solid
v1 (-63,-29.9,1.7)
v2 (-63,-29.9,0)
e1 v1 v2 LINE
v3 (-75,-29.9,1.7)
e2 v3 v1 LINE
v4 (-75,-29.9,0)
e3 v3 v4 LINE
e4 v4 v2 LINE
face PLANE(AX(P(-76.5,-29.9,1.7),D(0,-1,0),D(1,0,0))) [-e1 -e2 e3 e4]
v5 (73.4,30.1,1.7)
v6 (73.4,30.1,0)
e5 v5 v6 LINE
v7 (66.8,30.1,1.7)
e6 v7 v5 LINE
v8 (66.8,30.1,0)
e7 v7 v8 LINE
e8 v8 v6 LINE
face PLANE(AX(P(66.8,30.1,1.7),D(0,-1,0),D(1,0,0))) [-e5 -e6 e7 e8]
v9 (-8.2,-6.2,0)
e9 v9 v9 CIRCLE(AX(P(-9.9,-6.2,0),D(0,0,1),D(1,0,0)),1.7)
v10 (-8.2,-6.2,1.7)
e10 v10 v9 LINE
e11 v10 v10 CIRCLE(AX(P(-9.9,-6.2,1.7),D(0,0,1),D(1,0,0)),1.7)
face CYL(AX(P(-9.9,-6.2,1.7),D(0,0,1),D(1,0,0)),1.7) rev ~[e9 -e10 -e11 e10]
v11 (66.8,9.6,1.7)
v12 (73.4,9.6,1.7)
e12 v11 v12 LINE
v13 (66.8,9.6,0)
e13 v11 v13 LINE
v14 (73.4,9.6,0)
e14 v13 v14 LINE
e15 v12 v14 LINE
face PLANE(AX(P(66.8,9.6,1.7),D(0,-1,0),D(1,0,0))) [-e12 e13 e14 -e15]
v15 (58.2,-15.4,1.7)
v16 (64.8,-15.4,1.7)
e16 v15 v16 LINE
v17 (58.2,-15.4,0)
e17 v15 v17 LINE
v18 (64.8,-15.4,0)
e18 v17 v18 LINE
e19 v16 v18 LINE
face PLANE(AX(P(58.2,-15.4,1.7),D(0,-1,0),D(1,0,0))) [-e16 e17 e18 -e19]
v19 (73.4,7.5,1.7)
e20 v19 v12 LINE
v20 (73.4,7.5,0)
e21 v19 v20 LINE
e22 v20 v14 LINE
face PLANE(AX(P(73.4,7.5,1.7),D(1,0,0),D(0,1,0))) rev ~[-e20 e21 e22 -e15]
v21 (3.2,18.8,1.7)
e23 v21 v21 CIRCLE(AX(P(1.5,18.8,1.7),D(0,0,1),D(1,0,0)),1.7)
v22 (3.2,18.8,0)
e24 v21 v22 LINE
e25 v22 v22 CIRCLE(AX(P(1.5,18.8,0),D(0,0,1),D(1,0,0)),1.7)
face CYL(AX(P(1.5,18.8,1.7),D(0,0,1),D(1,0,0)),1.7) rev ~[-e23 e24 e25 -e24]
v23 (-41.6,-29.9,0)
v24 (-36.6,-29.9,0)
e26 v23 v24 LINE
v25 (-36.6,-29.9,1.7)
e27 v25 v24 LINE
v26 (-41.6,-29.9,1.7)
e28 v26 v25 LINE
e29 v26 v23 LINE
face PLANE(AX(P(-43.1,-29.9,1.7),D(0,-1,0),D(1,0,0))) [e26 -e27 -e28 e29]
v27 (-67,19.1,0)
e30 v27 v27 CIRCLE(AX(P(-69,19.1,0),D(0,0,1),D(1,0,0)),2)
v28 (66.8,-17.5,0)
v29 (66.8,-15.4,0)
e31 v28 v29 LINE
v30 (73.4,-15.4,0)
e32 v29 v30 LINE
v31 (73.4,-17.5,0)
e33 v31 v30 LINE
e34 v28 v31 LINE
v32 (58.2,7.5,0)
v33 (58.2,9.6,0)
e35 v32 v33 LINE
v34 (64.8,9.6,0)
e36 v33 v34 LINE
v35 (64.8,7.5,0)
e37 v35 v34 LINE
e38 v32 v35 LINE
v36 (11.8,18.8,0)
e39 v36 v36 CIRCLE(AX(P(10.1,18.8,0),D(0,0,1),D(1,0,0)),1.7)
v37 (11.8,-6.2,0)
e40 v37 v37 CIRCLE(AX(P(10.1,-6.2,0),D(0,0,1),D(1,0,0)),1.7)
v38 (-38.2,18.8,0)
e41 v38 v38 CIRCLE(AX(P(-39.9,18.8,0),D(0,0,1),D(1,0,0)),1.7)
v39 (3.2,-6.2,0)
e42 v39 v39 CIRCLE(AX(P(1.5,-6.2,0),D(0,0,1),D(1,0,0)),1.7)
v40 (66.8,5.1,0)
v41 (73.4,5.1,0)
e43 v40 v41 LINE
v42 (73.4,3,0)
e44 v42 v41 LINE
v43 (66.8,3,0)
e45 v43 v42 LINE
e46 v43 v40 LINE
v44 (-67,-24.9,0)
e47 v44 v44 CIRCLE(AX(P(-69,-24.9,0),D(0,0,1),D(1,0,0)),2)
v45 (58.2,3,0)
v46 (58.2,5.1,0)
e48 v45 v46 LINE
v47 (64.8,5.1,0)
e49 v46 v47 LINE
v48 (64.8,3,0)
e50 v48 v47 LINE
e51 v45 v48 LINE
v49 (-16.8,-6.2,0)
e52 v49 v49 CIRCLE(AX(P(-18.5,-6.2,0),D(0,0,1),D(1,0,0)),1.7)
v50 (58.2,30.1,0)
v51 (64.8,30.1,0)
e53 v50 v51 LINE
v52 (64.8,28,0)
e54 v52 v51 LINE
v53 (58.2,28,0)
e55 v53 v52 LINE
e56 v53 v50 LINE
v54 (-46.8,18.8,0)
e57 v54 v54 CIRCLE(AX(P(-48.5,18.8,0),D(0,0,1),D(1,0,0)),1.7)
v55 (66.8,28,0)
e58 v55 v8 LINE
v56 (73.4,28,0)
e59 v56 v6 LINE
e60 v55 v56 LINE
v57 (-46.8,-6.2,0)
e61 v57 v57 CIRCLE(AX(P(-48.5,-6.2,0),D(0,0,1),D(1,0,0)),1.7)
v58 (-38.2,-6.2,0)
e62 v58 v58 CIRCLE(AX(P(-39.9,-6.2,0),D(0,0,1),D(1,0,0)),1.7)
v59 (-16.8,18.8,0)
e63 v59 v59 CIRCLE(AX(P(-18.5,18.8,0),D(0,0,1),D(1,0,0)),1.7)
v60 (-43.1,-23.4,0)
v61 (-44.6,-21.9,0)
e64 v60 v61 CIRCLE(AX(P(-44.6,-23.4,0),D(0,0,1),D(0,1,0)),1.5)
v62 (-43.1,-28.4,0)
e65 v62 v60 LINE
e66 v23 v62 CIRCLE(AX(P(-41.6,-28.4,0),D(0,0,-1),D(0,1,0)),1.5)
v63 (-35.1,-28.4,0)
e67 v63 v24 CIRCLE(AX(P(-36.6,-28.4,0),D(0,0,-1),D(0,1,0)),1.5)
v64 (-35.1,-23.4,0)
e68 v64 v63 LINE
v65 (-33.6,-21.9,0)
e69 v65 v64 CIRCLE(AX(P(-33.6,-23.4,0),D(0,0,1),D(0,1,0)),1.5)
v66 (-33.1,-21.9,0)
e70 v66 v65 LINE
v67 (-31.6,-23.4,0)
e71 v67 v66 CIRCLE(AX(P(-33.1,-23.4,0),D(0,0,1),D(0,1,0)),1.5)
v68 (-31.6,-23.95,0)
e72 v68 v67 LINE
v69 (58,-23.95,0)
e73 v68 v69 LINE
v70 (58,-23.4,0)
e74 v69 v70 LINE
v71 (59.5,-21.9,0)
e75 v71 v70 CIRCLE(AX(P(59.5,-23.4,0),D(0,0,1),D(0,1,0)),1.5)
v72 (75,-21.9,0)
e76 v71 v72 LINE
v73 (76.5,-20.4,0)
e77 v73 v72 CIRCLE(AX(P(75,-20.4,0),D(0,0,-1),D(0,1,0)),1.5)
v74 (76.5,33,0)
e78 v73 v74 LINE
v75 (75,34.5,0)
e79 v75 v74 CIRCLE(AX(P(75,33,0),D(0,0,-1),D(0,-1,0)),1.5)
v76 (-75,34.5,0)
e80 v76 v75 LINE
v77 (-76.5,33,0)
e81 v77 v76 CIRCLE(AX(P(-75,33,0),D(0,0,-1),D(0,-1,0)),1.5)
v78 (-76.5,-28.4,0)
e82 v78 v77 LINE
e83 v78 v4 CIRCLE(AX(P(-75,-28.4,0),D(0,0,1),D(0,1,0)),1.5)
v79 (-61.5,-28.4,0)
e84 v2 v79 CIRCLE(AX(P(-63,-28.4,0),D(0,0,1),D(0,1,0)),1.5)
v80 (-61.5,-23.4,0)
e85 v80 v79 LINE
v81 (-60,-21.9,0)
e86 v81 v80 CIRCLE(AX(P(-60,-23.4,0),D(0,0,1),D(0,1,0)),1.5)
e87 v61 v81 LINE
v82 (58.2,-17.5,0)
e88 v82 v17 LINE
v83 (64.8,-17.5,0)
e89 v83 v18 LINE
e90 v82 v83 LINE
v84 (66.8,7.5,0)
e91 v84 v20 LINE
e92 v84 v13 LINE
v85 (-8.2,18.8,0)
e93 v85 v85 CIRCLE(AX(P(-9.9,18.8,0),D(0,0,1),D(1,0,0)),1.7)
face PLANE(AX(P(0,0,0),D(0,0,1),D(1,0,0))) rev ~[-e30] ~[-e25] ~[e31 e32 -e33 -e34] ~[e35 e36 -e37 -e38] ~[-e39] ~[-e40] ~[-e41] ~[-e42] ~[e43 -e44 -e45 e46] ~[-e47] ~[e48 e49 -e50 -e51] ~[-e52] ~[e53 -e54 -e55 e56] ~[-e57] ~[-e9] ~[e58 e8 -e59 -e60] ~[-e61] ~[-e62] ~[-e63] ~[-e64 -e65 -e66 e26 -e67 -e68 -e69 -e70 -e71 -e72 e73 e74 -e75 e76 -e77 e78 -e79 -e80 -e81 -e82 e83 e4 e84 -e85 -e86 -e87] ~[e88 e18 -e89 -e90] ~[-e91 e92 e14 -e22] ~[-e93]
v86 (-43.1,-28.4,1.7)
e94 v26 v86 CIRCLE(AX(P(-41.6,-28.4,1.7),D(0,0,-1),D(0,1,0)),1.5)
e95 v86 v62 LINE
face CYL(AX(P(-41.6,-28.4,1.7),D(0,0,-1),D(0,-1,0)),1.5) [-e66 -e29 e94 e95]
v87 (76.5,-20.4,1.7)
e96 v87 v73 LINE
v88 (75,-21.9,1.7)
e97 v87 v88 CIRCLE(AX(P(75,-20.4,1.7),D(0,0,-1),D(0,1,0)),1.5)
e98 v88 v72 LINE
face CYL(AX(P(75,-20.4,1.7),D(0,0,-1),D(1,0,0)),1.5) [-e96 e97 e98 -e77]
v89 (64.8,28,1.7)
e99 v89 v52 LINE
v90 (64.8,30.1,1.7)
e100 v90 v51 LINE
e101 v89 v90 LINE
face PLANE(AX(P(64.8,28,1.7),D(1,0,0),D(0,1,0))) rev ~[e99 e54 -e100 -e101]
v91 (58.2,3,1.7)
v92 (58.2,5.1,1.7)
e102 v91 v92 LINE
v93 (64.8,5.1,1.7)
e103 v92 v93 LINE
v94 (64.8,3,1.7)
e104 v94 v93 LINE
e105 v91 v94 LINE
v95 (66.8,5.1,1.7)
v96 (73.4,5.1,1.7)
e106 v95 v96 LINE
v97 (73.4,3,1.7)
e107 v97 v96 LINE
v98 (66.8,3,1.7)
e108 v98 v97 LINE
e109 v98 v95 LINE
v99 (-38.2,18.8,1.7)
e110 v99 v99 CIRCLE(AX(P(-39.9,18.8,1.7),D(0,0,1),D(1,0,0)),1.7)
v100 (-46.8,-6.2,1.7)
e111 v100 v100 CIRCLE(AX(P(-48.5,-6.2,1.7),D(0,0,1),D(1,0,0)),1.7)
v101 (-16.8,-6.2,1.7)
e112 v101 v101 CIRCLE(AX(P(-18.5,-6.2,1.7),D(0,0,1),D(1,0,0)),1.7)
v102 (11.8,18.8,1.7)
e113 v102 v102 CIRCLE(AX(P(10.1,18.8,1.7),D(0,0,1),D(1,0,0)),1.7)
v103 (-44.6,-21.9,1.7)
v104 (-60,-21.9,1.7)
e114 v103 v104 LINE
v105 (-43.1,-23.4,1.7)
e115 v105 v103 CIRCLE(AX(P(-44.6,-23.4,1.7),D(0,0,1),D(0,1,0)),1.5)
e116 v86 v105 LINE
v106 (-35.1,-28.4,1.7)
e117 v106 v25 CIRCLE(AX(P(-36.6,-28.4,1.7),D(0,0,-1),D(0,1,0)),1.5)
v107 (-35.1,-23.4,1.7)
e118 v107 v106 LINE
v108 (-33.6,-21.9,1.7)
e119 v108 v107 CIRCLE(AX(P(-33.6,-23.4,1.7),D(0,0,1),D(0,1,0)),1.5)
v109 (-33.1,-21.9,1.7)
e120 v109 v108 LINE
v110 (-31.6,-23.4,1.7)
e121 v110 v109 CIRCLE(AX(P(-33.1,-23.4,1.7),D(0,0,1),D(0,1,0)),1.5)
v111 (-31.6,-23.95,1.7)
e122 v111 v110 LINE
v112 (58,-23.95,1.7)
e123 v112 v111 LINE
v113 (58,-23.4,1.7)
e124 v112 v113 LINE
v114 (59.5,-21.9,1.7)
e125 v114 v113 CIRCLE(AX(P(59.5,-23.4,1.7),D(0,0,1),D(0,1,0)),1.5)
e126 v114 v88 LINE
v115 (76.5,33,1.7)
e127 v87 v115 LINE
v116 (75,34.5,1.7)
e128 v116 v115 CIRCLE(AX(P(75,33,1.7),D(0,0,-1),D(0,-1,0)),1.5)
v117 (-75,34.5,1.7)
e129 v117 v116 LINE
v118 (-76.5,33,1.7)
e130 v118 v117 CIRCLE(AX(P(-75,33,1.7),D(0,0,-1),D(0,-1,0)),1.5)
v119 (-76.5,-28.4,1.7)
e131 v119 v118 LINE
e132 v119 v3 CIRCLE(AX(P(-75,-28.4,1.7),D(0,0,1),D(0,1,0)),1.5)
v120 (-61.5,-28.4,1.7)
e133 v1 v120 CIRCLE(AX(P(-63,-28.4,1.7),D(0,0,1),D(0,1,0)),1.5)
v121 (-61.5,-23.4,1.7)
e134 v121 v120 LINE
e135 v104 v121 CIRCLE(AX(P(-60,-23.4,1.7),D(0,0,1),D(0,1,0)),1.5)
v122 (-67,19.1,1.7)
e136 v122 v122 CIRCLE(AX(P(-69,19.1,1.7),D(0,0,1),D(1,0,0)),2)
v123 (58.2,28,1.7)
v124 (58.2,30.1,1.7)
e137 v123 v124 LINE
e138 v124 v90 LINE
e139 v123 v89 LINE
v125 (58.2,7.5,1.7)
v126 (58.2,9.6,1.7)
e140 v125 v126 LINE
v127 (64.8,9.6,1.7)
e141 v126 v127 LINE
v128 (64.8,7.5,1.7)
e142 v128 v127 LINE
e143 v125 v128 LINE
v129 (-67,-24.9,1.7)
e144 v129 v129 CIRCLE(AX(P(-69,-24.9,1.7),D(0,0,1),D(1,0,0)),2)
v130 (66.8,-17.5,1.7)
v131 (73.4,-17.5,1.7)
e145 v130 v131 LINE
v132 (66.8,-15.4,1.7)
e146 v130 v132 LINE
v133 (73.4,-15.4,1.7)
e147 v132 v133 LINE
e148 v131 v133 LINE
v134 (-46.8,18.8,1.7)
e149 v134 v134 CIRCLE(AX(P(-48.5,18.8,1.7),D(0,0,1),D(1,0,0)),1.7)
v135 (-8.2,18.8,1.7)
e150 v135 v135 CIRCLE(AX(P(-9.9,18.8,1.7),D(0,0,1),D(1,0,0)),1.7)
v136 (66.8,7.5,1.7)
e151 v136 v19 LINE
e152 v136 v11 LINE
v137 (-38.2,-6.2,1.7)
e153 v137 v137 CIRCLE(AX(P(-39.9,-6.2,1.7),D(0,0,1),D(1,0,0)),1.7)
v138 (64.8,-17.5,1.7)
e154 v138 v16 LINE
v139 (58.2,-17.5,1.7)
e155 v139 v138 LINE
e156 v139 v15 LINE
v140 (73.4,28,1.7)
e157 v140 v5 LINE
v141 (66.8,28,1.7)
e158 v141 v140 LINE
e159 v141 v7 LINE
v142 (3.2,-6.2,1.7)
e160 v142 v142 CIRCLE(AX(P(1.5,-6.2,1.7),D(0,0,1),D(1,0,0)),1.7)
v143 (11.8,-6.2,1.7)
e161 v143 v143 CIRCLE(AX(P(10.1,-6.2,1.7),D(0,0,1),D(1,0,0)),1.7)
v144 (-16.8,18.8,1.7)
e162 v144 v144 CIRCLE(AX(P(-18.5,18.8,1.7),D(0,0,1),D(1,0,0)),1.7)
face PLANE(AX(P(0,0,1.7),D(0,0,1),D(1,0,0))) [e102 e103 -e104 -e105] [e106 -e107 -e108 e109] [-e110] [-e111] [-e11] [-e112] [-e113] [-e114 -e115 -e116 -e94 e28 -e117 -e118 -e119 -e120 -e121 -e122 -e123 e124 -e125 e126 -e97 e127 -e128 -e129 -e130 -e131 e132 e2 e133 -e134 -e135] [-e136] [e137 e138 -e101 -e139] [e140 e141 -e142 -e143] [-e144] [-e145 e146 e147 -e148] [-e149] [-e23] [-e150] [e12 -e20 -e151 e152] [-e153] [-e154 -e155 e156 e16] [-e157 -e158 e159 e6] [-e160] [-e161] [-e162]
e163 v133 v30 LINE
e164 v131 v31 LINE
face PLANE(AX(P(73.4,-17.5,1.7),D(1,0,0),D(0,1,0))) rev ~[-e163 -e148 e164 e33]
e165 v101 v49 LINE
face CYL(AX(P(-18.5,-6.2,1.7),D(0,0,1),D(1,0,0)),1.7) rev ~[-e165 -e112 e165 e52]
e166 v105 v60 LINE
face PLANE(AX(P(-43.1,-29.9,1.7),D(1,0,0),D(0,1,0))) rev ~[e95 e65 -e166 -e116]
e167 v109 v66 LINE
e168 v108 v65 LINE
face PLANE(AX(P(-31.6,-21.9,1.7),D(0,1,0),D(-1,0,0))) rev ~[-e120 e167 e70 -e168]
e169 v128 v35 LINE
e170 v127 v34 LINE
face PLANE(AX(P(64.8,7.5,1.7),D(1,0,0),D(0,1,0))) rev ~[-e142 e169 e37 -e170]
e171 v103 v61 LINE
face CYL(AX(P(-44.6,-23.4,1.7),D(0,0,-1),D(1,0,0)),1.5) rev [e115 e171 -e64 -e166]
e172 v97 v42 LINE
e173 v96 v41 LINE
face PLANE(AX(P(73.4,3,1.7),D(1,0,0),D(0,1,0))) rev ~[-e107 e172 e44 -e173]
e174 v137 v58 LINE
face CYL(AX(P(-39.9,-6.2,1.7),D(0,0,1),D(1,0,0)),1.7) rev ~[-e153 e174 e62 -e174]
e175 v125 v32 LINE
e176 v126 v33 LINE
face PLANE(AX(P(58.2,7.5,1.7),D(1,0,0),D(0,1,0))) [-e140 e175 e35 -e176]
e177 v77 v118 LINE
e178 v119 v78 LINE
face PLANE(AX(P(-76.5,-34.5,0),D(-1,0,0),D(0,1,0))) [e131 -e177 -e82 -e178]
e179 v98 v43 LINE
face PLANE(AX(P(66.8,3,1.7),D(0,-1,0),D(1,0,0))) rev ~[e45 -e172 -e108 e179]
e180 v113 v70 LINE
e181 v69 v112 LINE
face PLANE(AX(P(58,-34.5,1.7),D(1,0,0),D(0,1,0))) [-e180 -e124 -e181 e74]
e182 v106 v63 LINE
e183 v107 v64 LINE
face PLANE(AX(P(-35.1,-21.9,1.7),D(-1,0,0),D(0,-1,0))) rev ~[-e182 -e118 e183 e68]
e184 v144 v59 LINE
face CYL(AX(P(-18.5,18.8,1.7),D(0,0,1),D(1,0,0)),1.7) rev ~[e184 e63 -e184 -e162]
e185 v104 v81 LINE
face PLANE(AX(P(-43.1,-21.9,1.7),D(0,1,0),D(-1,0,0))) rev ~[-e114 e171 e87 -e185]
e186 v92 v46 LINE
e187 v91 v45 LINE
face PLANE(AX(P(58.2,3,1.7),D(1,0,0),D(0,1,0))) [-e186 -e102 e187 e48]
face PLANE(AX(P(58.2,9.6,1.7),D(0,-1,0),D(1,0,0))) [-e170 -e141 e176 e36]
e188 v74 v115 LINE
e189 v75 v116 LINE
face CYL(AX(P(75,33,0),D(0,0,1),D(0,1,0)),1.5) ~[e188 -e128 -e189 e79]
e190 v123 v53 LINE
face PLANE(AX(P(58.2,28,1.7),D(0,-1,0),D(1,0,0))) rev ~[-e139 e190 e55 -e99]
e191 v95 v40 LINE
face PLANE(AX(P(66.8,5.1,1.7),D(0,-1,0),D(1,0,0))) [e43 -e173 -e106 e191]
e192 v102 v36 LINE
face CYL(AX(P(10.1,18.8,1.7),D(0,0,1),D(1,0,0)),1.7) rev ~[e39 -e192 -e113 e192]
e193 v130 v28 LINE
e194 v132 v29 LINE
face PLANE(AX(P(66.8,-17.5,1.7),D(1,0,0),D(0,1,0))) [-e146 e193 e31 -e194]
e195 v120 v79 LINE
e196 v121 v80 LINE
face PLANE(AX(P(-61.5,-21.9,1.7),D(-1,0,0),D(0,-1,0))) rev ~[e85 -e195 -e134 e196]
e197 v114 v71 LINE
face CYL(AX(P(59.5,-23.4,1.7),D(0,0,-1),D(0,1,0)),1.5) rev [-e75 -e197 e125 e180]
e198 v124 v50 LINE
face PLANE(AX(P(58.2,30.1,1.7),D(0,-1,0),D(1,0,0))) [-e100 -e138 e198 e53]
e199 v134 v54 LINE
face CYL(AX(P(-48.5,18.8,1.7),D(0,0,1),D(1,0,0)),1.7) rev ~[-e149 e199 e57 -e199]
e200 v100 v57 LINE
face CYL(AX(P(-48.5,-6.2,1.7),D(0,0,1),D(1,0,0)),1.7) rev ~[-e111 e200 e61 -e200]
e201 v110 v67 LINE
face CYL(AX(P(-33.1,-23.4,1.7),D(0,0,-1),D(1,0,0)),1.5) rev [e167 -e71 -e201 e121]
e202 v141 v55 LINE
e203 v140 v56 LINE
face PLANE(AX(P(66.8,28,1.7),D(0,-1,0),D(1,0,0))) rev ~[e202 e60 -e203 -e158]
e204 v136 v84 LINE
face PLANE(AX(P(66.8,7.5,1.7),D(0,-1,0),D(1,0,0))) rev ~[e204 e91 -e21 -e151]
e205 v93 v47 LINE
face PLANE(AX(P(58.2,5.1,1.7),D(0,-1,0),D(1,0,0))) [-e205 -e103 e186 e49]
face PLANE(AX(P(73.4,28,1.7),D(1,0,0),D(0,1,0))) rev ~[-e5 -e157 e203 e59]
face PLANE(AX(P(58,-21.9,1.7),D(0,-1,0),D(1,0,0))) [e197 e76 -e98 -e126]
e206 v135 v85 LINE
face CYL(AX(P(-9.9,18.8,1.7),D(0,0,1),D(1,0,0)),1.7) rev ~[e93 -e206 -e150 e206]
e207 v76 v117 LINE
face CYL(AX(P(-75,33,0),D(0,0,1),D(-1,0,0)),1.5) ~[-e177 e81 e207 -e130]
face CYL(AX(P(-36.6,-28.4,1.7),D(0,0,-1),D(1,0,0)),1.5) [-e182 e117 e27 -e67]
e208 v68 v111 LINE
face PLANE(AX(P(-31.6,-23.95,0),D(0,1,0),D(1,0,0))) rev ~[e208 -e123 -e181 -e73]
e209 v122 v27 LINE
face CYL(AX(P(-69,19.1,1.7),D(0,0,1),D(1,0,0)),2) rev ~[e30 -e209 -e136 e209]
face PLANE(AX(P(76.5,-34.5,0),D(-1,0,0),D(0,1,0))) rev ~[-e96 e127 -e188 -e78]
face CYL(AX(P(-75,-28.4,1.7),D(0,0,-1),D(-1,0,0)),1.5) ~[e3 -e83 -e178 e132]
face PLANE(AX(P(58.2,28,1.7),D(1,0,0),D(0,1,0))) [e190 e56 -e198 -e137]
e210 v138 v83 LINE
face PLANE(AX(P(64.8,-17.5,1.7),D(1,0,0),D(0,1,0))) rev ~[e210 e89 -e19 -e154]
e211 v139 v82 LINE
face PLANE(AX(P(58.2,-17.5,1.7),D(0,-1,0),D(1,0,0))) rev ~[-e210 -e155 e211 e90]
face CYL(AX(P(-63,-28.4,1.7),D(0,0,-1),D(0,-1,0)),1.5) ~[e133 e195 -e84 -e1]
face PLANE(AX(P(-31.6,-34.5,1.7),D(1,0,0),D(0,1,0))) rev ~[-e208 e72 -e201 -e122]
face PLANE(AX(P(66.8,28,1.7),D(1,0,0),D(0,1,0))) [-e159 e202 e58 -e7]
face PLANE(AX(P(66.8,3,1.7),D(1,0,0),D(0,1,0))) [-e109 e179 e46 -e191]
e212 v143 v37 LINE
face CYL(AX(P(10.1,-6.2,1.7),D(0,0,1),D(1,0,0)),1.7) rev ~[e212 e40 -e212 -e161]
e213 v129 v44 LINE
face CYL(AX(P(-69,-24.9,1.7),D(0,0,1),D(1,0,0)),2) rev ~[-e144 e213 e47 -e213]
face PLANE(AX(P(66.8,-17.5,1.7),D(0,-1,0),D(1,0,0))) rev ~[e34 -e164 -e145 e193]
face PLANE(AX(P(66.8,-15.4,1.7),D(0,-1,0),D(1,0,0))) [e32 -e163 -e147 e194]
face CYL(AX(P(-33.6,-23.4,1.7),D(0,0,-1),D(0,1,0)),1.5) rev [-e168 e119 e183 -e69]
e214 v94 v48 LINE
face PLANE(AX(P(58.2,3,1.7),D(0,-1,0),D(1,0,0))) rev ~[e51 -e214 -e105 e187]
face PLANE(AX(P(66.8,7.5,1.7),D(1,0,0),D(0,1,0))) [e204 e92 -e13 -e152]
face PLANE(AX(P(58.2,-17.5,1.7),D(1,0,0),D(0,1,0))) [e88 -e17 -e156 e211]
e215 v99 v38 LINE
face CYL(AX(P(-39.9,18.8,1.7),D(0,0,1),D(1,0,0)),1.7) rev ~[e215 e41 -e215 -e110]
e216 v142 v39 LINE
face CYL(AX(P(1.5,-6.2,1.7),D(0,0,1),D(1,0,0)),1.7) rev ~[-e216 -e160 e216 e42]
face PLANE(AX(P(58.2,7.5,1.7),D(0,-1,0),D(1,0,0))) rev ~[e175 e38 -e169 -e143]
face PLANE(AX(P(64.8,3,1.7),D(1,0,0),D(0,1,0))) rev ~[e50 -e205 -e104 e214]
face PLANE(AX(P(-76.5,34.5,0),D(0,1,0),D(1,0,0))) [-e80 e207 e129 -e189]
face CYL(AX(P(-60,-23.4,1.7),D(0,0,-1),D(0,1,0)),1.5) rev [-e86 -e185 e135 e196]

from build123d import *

# Parameters (mm, degrees)
F0_W     = 153
F0_H     = 69
F1_DEPTH = 1.7
F2_W     = 15
F2_H     = 4.6
F2_W_2   = 8
F2_W_3   = 1.9
F2_H_2   = 8.5
F2_W_4   = 18.5
F2_H_3   = 12.6
F2_R     = 2
F2_W_5   = 6.6
F2_H_4   = 2.1
F2_R_2   = 1.7
F3_DEPTH = 1.701
F4_W     = 89.6
F4_H     = 10.55
F5_DEPTH = 1.701
F6_R     = 1.5


with BuildPart() as f1:
    # F0 (on Top) → F1 (new body)
    with BuildSketch(Plane.XY):
        Rectangle(F0_W, F0_H)
    extrude(amount=F1_DEPTH)

    # F2 (on face) → F3 (cut, through all)
    with BuildSketch(Plane.XY.offset(1.7)):
        with Locations((-69, -32.2)):
            Rectangle(F2_W, F2_H)
        Polygon((-61.5, -29.9), (-61.5, -34.5), (-43.1, -34.5), (-43.1, -29.9), (-43.1, -21.9), (-61.5, -21.9), align=None)
        with Locations((-39.1, -32.2)):
            Rectangle(F2_W_2, F2_H)
        Polygon((-35.1, -29.9), (-35.1, -34.5), (-31.6, -34.5), (-31.6, -21.9), (-35.1, -21.9), align=None)
        with Locations((-19.35, -30.25)):
            Rectangle(F2_W_3, F2_H_2)
        with Locations((67.25, -28.2)):
            Rectangle(F2_W_4, F2_H_3)
        with Locations((-69, -24.9)):
            Circle(F2_R)
        with Locations((-69, 19.1)):
            Circle(F2_R)
        with Locations((61.5, 29.05)):
            Rectangle(F2_W_5, F2_H_4)
        with Locations((61.5, 8.55)):
            Rectangle(F2_W_5, F2_H_4)
        with Locations((-48.5, 18.8)):
            Circle(F2_R_2)
        with Locations((-18.5, 18.8)):
            Circle(F2_R_2)
        with Locations((1.5, 18.8)):
            Circle(F2_R_2)
        with Locations((-39.9, 18.8)):
            Circle(F2_R_2)
        with Locations((-9.9, 18.8)):
            Circle(F2_R_2)
        with Locations((10.1, 18.8)):
            Circle(F2_R_2)
        with Locations((70.1, 8.55)):
            Rectangle(F2_W_5, F2_H_4)
        with Locations((70.1, 29.05)):
            Rectangle(F2_W_5, F2_H_4)
        with Locations((70.1, -16.45)):
            Rectangle(F2_W_5, F2_H_4)
        with Locations((61.5, 4.05)):
            Rectangle(F2_W_5, F2_H_4)
        with Locations((70.1, 4.05)):
            Rectangle(F2_W_5, F2_H_4)
        with Locations((61.5, -16.45)):
            Rectangle(F2_W_5, F2_H_4)
        with Locations((1.5, -6.2)):
            Circle(F2_R_2)
        with Locations((-18.5, -6.2)):
            Circle(F2_R_2)
        with Locations((-9.9, -6.2)):
            Circle(F2_R_2)
        with Locations((10.1, -6.2)):
            Circle(F2_R_2)
        with Locations((-39.9, -6.2)):
            Circle(F2_R_2)
        with Locations((-48.5, -6.2)):
            Circle(F2_R_2)
    extrude(amount=-F3_DEPTH, mode=Mode.SUBTRACT)

    # F4 (on Top) → F5 (cut, through all)
    with BuildSketch(Plane.XY):
        with Locations((13.2, -29.225)):
            Rectangle(F4_W, F4_H)
    extrude(amount=F5_DEPTH, mode=Mode.SUBTRACT)

    # F6
    f6_edges = [f1.edges().sort_by_distance(p)[0] for p in [
        (-35.1, -21.9, 0.85),
        (-31.6, -21.9, 0.85),
        (-43.1, -21.9, 0.85),
        (58, -21.9, 0.85),
        (76.5, -21.9, 0.85),
        (-35.1, -29.9, 0.85),
        (-43.1, -29.9, 0.85),
        (-76.5, -29.9, 0.85),
        (-61.5, -29.9, 0.85),
        (-61.5, -21.9, 0.85),
        (76.5, 34.5, 0.85),
        (-76.5, 34.5, 0.85),
    ]]
    fillet(f6_edges, radius=F6_R)


solid = f1.part
